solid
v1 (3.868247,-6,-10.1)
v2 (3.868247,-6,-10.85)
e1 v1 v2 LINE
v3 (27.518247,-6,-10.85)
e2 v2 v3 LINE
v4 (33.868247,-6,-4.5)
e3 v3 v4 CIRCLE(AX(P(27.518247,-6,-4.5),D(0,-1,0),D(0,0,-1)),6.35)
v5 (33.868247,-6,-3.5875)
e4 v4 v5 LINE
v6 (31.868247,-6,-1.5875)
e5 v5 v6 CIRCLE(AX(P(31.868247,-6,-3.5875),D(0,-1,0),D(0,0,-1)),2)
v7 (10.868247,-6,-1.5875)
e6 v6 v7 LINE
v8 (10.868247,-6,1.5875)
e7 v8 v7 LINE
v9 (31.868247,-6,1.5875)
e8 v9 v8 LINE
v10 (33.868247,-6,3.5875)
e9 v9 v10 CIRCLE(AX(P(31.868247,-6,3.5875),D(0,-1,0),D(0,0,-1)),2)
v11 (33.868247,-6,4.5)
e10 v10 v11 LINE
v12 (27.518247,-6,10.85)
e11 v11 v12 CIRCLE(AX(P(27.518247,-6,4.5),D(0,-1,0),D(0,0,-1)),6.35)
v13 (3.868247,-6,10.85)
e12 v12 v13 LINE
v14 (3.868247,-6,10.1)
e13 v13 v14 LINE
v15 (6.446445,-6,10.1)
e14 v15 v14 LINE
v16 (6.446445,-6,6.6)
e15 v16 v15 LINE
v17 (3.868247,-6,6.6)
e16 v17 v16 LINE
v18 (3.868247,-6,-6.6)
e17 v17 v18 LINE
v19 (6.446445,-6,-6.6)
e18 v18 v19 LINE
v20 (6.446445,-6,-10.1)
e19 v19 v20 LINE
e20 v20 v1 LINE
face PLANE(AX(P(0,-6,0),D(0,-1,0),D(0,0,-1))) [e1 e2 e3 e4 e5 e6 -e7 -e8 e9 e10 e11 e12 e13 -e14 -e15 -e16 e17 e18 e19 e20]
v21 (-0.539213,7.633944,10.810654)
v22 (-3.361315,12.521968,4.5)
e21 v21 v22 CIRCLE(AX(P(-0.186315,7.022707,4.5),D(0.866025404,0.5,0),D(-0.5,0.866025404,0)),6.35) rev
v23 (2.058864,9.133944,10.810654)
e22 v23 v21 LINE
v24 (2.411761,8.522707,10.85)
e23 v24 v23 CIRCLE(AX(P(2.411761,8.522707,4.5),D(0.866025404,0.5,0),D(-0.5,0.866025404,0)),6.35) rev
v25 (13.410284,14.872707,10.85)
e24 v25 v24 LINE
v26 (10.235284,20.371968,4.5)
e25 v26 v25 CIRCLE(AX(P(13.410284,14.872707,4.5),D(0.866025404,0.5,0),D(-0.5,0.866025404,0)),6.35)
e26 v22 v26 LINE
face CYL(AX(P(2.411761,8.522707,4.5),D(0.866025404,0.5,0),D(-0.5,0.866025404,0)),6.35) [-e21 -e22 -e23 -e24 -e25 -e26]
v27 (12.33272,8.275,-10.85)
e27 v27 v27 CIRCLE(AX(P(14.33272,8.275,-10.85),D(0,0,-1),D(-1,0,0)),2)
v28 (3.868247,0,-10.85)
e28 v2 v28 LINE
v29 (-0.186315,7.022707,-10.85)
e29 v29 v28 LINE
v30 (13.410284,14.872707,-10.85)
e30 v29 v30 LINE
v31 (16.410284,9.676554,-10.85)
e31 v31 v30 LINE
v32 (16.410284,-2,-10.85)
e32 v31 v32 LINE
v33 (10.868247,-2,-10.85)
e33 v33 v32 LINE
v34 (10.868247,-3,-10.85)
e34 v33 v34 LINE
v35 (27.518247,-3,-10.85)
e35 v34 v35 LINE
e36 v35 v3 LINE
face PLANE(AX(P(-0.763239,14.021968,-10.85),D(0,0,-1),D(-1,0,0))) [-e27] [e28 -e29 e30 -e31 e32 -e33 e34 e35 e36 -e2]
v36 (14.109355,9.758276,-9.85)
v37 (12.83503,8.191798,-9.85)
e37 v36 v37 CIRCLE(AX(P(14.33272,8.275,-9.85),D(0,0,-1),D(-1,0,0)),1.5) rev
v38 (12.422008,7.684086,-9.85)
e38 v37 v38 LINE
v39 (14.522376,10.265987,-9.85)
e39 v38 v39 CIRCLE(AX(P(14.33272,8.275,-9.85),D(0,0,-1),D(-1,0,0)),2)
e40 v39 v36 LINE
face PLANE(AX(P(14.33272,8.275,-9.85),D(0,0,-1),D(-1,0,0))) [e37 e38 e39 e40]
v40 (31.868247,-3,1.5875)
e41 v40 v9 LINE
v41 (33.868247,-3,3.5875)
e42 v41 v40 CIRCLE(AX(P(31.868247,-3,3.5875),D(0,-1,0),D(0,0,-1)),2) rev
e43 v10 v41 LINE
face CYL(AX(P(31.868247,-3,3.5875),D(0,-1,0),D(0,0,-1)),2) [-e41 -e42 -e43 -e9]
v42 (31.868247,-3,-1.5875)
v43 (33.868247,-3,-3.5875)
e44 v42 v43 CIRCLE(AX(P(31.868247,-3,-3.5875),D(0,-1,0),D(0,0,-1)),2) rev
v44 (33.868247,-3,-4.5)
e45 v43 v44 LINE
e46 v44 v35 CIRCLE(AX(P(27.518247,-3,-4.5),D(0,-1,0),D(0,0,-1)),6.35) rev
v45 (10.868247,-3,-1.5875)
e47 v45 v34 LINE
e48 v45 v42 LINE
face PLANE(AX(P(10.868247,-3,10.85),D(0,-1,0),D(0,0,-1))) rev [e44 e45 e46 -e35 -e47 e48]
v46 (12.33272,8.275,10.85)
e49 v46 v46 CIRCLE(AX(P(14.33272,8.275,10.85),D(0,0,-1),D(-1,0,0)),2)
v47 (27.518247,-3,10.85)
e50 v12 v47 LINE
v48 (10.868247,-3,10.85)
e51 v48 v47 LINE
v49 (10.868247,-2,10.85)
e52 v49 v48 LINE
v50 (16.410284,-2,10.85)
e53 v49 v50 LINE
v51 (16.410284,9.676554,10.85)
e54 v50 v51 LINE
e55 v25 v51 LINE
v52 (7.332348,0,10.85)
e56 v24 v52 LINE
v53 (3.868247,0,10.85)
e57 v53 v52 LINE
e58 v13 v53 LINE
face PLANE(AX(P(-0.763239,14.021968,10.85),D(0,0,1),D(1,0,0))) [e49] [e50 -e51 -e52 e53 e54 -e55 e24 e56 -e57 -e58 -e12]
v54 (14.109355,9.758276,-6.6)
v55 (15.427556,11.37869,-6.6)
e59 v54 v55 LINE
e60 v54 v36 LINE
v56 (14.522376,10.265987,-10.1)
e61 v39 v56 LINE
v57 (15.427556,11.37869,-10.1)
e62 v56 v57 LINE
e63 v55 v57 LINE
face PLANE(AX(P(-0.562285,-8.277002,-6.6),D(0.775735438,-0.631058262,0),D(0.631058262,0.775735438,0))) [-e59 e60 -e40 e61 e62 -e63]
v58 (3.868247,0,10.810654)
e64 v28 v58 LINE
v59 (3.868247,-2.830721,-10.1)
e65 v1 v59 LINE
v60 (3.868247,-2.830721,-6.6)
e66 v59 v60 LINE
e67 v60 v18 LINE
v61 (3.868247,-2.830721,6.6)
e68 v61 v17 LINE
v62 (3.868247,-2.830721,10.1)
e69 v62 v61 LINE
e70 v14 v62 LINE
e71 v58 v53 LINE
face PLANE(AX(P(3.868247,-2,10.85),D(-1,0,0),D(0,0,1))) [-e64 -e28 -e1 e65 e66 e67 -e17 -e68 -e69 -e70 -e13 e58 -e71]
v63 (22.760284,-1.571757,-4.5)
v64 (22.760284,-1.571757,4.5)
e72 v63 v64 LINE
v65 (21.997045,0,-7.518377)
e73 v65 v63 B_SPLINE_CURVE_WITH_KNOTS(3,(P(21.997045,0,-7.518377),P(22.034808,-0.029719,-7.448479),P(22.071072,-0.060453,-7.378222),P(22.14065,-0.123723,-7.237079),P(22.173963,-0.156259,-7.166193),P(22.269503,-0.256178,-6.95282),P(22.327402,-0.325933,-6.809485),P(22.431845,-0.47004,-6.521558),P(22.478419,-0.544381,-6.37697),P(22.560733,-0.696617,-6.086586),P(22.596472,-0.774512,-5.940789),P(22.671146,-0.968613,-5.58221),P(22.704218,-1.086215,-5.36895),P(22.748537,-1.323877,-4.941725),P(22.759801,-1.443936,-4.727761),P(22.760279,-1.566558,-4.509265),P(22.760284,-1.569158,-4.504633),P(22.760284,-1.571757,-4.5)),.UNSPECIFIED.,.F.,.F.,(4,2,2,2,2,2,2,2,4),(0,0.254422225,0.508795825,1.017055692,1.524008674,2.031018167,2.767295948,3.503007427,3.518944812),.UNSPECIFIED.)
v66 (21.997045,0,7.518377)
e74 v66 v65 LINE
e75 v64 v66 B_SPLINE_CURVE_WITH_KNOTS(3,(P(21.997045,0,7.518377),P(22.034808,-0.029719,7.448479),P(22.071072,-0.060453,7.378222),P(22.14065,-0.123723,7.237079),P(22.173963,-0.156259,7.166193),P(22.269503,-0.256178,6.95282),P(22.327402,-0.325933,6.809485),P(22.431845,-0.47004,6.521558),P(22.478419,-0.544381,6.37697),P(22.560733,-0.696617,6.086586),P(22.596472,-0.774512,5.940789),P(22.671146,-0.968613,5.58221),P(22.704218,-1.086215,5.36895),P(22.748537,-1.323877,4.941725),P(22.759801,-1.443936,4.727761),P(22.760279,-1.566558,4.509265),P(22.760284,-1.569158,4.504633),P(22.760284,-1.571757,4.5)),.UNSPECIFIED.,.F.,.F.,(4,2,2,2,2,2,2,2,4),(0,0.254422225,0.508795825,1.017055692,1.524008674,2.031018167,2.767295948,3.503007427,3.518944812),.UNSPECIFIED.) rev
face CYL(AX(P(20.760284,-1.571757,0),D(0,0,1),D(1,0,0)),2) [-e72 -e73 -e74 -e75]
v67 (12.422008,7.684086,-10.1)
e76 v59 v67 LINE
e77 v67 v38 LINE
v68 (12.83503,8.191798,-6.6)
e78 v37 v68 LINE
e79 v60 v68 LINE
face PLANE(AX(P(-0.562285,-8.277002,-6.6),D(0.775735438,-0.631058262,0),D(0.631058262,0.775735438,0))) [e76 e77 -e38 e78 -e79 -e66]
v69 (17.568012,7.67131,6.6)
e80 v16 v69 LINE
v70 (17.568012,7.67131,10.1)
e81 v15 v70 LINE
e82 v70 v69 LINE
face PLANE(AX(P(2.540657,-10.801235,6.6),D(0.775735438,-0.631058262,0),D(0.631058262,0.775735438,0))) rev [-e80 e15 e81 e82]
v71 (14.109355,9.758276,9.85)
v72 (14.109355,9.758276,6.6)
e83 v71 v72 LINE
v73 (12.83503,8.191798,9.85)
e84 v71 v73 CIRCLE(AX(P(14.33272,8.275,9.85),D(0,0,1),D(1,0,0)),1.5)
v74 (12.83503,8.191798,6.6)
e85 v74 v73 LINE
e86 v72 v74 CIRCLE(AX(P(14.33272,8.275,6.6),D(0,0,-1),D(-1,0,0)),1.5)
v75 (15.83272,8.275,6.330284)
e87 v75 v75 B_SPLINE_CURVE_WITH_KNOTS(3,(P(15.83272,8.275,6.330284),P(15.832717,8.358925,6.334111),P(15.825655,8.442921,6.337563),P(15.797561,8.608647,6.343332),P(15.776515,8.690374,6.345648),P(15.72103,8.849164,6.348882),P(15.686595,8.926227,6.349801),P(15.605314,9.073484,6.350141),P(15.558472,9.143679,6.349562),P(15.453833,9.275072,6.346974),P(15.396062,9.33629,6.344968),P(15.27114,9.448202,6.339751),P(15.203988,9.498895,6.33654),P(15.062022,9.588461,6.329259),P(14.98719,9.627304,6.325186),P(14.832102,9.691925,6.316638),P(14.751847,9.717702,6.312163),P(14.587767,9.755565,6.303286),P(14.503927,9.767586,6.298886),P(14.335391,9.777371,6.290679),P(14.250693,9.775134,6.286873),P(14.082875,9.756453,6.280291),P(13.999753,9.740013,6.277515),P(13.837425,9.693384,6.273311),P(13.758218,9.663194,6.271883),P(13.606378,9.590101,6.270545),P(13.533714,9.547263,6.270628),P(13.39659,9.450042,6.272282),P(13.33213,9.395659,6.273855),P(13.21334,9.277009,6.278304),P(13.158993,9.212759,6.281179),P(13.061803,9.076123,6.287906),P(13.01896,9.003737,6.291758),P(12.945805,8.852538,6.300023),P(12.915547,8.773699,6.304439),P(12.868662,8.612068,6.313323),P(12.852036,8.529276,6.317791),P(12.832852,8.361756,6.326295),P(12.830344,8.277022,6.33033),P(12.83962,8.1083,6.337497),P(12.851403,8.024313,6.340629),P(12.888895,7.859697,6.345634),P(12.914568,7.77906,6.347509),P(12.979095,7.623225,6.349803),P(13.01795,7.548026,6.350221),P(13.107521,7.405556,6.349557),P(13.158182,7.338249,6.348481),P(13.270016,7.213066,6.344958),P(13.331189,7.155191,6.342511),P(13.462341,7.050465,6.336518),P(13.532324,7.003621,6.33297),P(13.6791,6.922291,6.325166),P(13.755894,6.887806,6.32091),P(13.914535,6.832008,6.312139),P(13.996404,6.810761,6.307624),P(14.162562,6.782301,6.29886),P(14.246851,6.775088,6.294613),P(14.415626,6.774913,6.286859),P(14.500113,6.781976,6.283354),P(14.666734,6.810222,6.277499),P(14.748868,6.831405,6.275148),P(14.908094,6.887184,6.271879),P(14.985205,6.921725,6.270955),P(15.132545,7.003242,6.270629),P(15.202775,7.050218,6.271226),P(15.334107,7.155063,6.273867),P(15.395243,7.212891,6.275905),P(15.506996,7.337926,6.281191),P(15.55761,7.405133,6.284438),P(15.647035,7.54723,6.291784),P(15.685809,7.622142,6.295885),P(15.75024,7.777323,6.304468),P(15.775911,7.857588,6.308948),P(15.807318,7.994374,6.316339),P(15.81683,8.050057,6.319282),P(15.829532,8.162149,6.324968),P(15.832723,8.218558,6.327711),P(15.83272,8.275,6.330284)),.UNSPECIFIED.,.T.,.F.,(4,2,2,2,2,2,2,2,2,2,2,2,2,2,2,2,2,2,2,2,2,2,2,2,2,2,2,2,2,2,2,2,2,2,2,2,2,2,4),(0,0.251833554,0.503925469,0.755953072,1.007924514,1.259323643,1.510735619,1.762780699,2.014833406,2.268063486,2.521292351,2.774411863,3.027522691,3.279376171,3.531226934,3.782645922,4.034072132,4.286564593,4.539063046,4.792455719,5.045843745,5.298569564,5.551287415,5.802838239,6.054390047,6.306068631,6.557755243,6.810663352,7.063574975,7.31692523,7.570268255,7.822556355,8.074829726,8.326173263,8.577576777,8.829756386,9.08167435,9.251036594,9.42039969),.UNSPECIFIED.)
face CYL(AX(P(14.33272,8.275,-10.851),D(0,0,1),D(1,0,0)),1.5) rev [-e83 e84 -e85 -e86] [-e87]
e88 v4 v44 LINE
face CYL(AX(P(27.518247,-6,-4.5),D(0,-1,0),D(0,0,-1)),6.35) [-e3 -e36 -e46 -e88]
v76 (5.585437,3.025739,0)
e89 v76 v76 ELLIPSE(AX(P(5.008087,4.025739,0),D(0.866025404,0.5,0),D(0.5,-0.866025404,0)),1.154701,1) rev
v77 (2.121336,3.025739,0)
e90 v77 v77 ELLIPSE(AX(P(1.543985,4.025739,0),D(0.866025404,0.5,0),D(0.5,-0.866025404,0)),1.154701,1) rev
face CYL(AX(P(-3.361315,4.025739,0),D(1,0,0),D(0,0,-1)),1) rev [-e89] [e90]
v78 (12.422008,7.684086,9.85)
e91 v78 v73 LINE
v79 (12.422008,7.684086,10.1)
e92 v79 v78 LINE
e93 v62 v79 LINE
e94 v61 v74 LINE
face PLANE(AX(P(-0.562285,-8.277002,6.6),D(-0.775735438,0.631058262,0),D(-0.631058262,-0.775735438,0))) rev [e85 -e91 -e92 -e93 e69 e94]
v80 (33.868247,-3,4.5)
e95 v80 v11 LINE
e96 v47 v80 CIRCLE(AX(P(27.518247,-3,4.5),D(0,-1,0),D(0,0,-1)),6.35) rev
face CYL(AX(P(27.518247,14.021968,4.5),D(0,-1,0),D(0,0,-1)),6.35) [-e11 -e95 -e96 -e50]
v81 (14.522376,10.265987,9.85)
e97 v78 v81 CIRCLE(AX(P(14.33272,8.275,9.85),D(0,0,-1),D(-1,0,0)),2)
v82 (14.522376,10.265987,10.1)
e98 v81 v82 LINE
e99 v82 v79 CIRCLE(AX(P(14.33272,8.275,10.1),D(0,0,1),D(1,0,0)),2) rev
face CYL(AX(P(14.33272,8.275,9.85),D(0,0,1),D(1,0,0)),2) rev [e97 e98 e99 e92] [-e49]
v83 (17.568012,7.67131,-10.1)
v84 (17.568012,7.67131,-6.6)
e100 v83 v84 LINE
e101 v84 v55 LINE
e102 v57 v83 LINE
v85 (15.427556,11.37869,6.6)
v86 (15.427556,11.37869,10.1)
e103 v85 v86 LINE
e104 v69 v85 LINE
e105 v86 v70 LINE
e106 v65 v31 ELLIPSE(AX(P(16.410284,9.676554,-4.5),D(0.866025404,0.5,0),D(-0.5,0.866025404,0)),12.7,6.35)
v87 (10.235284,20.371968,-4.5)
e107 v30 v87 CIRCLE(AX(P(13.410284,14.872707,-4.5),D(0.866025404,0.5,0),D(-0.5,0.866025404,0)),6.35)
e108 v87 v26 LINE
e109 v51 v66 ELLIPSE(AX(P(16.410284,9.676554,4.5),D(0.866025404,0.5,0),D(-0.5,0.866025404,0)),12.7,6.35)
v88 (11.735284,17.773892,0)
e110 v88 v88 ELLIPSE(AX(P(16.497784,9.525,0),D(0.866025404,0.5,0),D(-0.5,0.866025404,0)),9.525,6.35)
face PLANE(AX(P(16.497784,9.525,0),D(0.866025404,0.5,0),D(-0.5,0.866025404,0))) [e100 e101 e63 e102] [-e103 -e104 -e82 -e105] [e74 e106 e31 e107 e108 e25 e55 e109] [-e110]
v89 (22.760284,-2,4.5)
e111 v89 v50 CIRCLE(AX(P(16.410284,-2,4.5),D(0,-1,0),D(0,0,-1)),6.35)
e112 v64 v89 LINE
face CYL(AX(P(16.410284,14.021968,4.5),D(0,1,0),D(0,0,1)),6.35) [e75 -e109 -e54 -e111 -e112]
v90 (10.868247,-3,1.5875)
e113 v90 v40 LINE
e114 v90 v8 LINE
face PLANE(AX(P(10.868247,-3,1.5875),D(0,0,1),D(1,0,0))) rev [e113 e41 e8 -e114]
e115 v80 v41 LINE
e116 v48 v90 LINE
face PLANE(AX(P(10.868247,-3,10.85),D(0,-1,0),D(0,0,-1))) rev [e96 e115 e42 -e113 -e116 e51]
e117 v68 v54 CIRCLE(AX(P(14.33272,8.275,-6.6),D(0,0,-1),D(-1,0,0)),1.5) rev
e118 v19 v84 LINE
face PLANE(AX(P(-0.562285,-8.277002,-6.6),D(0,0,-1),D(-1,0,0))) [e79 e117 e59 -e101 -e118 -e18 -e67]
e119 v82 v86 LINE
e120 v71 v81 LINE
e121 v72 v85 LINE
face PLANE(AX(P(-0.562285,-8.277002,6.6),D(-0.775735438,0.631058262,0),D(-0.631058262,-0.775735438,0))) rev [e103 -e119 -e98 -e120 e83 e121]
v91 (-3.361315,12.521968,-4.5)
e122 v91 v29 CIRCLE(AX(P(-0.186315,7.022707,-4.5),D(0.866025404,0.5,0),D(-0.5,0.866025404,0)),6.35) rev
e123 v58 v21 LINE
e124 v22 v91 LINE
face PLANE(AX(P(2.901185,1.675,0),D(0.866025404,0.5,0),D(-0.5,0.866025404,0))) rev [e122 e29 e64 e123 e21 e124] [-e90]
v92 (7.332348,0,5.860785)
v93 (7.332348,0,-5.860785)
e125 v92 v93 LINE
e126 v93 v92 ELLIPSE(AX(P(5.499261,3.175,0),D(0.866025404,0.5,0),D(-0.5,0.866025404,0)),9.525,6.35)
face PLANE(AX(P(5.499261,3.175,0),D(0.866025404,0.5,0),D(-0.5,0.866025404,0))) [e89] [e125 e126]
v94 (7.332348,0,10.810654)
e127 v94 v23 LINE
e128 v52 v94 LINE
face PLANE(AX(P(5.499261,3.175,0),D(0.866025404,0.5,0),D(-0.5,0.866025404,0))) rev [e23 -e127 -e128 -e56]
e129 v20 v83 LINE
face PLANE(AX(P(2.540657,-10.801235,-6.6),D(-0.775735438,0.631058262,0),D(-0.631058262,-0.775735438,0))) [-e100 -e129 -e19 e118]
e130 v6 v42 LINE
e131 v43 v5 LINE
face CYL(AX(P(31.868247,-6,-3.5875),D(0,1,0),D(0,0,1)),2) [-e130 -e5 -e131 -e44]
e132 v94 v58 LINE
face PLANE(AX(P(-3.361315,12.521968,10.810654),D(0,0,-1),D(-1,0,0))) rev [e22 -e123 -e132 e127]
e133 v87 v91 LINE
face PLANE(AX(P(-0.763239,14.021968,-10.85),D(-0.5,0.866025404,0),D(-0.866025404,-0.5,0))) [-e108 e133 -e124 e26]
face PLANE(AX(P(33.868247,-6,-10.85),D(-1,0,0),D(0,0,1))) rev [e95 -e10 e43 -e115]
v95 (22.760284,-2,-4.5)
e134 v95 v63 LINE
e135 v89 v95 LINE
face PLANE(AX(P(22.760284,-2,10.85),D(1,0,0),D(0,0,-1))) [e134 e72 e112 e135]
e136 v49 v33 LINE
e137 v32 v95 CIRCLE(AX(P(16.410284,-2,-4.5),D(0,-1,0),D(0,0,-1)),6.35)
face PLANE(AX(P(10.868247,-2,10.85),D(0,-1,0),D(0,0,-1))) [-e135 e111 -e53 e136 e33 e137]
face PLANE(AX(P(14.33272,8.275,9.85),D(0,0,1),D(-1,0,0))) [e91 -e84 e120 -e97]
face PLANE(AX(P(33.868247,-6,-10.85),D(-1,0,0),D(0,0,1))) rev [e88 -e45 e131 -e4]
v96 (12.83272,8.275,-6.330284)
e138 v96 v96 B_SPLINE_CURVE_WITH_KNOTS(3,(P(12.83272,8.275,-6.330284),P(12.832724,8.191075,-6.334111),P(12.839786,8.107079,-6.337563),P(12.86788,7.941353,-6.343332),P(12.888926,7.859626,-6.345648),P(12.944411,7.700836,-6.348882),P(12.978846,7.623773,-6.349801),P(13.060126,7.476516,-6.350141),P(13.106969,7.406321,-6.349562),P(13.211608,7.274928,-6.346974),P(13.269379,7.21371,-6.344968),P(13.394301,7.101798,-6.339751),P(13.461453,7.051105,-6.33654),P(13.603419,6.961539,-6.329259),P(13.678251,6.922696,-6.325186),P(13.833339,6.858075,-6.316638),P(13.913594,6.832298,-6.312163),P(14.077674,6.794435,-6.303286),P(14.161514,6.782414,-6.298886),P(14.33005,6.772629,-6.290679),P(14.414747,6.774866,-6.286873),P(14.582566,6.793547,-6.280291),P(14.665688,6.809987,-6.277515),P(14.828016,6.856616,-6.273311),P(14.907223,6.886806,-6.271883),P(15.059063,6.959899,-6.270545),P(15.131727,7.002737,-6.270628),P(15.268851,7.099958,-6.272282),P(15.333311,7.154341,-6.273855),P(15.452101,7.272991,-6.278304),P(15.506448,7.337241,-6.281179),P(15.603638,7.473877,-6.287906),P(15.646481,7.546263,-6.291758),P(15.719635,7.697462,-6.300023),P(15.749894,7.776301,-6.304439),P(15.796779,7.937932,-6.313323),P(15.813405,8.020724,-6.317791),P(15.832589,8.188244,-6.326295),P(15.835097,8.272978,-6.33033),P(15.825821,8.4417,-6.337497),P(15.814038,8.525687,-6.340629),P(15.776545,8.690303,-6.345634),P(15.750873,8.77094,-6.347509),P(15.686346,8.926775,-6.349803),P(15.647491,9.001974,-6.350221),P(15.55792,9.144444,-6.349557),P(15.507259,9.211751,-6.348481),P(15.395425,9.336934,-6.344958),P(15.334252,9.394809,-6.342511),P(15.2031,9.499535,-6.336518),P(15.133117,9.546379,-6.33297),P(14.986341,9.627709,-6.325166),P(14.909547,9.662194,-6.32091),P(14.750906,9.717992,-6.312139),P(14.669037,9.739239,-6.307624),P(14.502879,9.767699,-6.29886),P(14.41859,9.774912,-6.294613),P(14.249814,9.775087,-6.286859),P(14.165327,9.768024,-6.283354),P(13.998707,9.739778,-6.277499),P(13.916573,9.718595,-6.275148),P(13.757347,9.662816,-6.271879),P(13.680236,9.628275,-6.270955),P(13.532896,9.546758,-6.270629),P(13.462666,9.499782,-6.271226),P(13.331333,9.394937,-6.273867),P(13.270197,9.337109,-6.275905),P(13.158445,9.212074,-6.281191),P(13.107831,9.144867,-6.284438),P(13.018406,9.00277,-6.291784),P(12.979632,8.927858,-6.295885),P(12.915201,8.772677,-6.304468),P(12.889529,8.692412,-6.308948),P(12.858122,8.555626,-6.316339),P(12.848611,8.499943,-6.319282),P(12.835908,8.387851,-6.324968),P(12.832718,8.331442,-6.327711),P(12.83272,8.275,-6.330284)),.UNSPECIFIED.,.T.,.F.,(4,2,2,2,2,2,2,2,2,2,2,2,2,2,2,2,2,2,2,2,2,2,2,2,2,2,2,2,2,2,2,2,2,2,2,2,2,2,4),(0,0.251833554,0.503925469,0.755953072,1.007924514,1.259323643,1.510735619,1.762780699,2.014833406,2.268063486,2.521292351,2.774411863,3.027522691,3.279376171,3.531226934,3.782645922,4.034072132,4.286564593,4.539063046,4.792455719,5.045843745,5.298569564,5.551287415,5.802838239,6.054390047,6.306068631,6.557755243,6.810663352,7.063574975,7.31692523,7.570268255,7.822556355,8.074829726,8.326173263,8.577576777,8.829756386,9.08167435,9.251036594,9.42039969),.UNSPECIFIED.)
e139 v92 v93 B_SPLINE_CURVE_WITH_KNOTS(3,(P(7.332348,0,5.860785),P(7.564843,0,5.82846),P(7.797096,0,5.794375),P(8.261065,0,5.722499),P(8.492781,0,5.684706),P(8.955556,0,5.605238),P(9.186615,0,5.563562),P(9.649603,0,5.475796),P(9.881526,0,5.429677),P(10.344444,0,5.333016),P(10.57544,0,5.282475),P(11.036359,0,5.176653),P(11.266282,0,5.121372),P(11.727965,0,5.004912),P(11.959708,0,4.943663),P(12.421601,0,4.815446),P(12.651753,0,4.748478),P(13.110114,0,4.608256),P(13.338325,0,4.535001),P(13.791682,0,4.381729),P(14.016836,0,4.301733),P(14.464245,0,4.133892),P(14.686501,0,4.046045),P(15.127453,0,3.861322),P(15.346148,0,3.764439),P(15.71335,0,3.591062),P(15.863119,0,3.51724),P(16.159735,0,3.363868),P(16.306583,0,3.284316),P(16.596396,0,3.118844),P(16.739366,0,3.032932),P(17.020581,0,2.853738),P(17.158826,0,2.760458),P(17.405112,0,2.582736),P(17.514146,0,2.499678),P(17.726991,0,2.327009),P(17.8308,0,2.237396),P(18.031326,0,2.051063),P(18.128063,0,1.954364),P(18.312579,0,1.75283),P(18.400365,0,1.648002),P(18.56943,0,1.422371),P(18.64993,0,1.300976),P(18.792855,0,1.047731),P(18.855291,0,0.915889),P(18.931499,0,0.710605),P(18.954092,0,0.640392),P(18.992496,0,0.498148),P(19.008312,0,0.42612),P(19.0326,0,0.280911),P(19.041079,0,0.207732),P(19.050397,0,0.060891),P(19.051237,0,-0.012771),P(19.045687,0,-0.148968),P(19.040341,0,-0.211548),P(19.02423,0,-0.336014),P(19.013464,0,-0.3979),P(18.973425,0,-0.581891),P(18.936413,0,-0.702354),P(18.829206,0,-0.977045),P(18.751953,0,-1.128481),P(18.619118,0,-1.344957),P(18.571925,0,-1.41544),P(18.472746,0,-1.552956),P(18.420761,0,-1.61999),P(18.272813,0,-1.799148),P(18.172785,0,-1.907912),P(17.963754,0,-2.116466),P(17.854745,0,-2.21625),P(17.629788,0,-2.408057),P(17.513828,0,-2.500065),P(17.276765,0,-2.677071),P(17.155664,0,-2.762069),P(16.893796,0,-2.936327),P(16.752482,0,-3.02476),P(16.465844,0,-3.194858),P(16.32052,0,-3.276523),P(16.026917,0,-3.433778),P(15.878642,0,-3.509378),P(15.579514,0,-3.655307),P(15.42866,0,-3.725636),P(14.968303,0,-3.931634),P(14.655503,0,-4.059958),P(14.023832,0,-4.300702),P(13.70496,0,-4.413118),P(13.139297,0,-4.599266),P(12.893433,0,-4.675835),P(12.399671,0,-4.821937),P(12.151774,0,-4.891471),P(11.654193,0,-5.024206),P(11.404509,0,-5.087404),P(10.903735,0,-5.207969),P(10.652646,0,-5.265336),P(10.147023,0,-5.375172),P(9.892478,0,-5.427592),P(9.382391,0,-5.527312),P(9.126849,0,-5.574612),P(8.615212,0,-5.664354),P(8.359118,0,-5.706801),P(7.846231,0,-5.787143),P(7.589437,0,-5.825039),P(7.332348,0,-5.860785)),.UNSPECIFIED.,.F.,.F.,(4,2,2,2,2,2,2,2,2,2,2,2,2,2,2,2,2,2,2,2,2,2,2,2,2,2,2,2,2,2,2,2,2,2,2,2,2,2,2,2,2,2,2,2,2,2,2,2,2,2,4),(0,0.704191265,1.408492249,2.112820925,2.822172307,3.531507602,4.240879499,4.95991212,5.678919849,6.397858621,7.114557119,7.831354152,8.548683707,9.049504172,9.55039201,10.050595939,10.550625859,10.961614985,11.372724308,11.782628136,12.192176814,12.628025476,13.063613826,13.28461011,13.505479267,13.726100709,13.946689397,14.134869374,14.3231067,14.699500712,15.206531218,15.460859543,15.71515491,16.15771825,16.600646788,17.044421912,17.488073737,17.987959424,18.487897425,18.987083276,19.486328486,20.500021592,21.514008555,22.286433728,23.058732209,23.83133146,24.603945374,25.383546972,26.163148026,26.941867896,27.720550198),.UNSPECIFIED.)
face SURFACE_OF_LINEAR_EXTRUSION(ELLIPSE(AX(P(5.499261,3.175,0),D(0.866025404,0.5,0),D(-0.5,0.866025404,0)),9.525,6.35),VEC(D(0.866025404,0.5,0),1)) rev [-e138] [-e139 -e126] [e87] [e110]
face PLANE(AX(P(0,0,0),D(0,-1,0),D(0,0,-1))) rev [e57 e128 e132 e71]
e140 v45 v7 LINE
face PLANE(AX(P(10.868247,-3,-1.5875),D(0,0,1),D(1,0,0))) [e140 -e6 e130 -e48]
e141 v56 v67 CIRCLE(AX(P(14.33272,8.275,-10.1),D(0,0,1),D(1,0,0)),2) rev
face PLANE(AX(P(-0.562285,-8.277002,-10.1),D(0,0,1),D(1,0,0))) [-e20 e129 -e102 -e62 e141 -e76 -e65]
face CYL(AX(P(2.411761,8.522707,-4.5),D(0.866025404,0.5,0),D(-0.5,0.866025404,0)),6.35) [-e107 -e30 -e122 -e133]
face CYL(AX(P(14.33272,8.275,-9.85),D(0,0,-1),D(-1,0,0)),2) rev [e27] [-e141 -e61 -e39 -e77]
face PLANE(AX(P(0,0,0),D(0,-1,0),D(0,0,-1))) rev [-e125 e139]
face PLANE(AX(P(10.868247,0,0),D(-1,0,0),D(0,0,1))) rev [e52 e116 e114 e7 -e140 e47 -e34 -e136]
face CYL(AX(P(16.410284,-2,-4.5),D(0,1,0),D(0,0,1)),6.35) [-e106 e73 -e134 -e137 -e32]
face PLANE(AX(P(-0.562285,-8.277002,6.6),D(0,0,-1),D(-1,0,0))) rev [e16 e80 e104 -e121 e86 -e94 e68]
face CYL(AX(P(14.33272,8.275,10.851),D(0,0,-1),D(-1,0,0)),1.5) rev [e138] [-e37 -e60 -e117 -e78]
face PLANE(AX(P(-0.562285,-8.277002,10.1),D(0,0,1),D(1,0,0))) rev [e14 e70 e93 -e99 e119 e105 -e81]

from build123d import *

# Parameters (mm, degrees)
SKETCH2_W           = 21.7
SKETCH2_H           = 25.05
SKETCH2_RX          = 9.525
SKETCH2_RY          = 6.35
BOSS_EXTRUDE1_DEPTH = 12.7
SKETCH3_W           = 21.660653916
SKETCH3_H           = 25.05
BOSS_EXTRUDE2_DEPTH = 3
SKETCH5_W           = 18.892037138
SKETCH5_H           = 21.7
BOSS_EXTRUDE3_DEPTH = 2
SKETCH6_W           = 30
SKETCH6_H           = 21.7
BOSS_EXTRUDE4_DEPTH = 4
SKETCH7_W           = 21.7
SKETCH7_H           = 1
SKETCH7_W_2         = 3.175
SKETCH7_H_2         = 3
CUT_EXTRUDE2_DEPTH  = 23
SKETCH7_3_W         = 21.7
SKETCH7_3_H         = 7.272473706
CUT_EXTRUDE3_DEPTH  = 44.803879418
SKETCH11_R          = 1
CUT_EXTRUDE8_DEPTH  = 33.487034031
SKETCH15_W          = 4
SKETCH15_H          = 3.5
CUT_EXTRUDE9_DEPTH  = 28.443249292
CUT_EXTRUDE4_REACH  = 47.088
SKETCH9_R           = 1.5
SKETCH10_R          = 2
CUT_EXTRUDE7_DEPTH  = 1
FILLET5_R           = 6.35
FILLET6_R           = 2
FILLET7_R           = 2


with BuildPart() as part:
    # Sketch2 → Boss-Extrude1 (new body)
    with BuildSketch(Plane(origin=(16.497783942, 9.525, 0), x_dir=(0, 0, -1), z_dir=(0.8660254037844379, 0.5000000000000013, 0))):
        Rectangle(SKETCH2_W, SKETCH2_H)
        with Locations(Location((0, 0), (0, 0, 90))):
            Ellipse(SKETCH2_RX, SKETCH2_RY, mode=Mode.SUBTRACT)
    extrude(amount=-BOSS_EXTRUDE1_DEPTH)

    # Sketch3 → Boss-Extrude2 (add)
    with BuildSketch(Plane(origin=(5.499261314, 3.175, 0), x_dir=(0, 0, 1), z_dir=(-0.8660254037844379, -0.5000000000000014, 0))):
        with Locations((-0.019673042, 0)):
            Rectangle(SKETCH3_W, SKETCH3_H)
    extrude(amount=BOSS_EXTRUDE2_DEPTH)

    # Sketch5 → Boss-Extrude3 (add)
    with BuildSketch(Plane(origin=(0, 0, 0), x_dir=(-1, 0, 0), z_dir=(0, 1, 0))):
        with Locations((-13.314265373, 0)):
            Rectangle(SKETCH5_W, SKETCH5_H)
    extrude(amount=-BOSS_EXTRUDE3_DEPTH)

    # Sketch6 → Boss-Extrude4 (add)
    with BuildSketch(Plane.XZ.offset(2)):
        with Locations((18.868246804, 0)):
            Rectangle(SKETCH6_W, SKETCH6_H)
    extrude(amount=BOSS_EXTRUDE4_DEPTH)

    # Sketch7 → Cut-Extrude2 (cut)
    with BuildSketch(Plane(origin=(33.868246804, 0, 0), x_dir=(0, 0, -1), z_dir=(1, 0, 0))):
        with Locations((0, -2.5)):
            Rectangle(SKETCH7_W, SKETCH7_H)
        with Locations((0, -4.5)):
            Rectangle(SKETCH7_W_2, SKETCH7_H_2)
    extrude(amount=-CUT_EXTRUDE2_DEPTH, mode=Mode.SUBTRACT)

    # Sketch7<3> → Cut-Extrude3 (cut, through all)
    with BuildSketch(Plane(origin=(33.868246804, 0, 0), x_dir=(0, 0, -1), z_dir=(1, 0, 0))):
        with Locations((0, -9.636236853)):
            Rectangle(SKETCH7_3_W, SKETCH7_3_H)
    extrude(amount=-CUT_EXTRUDE3_DEPTH, mode=Mode.SUBTRACT)

    # Sketch11 → Cut-Extrude8 (cut, through all)
    with BuildSketch(Plane(origin=(19.672783942, 0.194872981, 0), x_dir=(0, 0, -1), z_dir=(-1, 0, 0))):
        with Locations(Location((0, -3.830865705, 0), (0, 0, 90))):
            Circle(SKETCH11_R)
    extrude(amount=CUT_EXTRUDE8_DEPTH, mode=Mode.SUBTRACT)

    # Sketch15 → Cut-Extrude9 (cut, symmetric)
    with BuildSketch(Plane(origin=(16.497783942, 9.525, 0), x_dir=(0.7757354378747654, -0.6310582623064579, 0), z_dir=(0.6310582623064579, 0.7757354378747654, 0))):
        with Locations((0, -8.35)):
            Rectangle(SKETCH15_W, SKETCH15_H)
    cut_extrude9 = extrude(amount=CUT_EXTRUDE9_DEPTH, both=True, mode=Mode.SUBTRACT)

    # Sketch9 → Cut-Extrude4 (cut, up to next)
    with BuildSketch(Plane(origin=(0, 0, -10.85), x_dir=(-1, 0, 0), z_dir=(0, 0, -1)), mode=Mode.PRIVATE) as cut_extrude4_sk1:
        with Locations((-14.332720433, 8.275)):
            Circle(SKETCH9_R)
    cut_extrude4_tool1 = extrude(cut_extrude4_sk1.sketch, amount=-CUT_EXTRUDE4_REACH, mode=Mode.PRIVATE) & part.part
    cut_extrude4 = cut_extrude4_tool1.solids().sort_by_distance((14.33272, 8.275, -10.85))[0]
    add(cut_extrude4, mode=Mode.SUBTRACT)

    # Sketch10 → Cut-Extrude7 (cut)
    with BuildSketch(Plane(origin=(0, 0, -10.85), x_dir=(-1, 0, 0), z_dir=(0, 0, -1))):
        with Locations((-14.332720433, 8.275)):
            Circle(SKETCH10_R)
    cut_extrude7 = extrude(amount=-CUT_EXTRUDE7_DEPTH, mode=Mode.SUBTRACT)

    # Mirror1: Cut-Extrude9, Cut-Extrude4, Cut-Extrude7 across plane
    add(cut_extrude9.mirror(Plane.XY), mode=Mode.SUBTRACT)
    add(cut_extrude4.mirror(Plane.XY), mode=Mode.SUBTRACT)
    add(cut_extrude7.mirror(Plane.XY), mode=Mode.SUBTRACT)

    # Fillet5
    fillet5_edges = [part.edges().sort_by_distance(p)[0] for p in [
        (33.868246804, -4.5, 10.85),
        (33.868246804, -4.5, -10.85),
        (22.760283942, -1, -10.85),
        (22.760283942, -1, 10.85),
        (4.736022628, 17.196968182, 10.85),
        (3.436984522, 16.446968182, -10.85),
    ]]
    fillet(fillet5_edges, radius=FILLET5_R)

    # Fillet6
    fillet6_edges = [part.edges().sort_by_distance(p)[0] for p in [
        (33.868246804, -4.5, 1.5875),
        (33.868246804, -4.5, -1.5875),
    ]]
    fillet(fillet6_edges, radius=FILLET6_R)

    # Fillet7
    # the kernel refuses this fillet: 2 mm, written as the material it takes off along each edge
    with BuildSketch(Plane(origin=(22.760283942, 0, 8.429393602), x_dir=(-1, 0, 0), z_dir=(0, 0, -1))) as fillet7_piece_1:
        with BuildLine():
            CenterArc((2, -1.571757441), FILLET7_R, 128.197977663, 51.802022337)
            Line((0, -1.571757441), (-0.04, -1.571757441))
            Line((-0.04, -1.571757441), (-0.04, 0))
            Line((-0.04, 0), (0, 0.04))
            ThreePointArc((0, 0.04), (0.381619343, 0.04), (0.73850346, 0.031435149))
            Line((0.73850346, 0.031435149), (0.763238686, 0))
        make_face()
    extrude(amount=16.858787203, mode=Mode.SUBTRACT)


solid = part.part
